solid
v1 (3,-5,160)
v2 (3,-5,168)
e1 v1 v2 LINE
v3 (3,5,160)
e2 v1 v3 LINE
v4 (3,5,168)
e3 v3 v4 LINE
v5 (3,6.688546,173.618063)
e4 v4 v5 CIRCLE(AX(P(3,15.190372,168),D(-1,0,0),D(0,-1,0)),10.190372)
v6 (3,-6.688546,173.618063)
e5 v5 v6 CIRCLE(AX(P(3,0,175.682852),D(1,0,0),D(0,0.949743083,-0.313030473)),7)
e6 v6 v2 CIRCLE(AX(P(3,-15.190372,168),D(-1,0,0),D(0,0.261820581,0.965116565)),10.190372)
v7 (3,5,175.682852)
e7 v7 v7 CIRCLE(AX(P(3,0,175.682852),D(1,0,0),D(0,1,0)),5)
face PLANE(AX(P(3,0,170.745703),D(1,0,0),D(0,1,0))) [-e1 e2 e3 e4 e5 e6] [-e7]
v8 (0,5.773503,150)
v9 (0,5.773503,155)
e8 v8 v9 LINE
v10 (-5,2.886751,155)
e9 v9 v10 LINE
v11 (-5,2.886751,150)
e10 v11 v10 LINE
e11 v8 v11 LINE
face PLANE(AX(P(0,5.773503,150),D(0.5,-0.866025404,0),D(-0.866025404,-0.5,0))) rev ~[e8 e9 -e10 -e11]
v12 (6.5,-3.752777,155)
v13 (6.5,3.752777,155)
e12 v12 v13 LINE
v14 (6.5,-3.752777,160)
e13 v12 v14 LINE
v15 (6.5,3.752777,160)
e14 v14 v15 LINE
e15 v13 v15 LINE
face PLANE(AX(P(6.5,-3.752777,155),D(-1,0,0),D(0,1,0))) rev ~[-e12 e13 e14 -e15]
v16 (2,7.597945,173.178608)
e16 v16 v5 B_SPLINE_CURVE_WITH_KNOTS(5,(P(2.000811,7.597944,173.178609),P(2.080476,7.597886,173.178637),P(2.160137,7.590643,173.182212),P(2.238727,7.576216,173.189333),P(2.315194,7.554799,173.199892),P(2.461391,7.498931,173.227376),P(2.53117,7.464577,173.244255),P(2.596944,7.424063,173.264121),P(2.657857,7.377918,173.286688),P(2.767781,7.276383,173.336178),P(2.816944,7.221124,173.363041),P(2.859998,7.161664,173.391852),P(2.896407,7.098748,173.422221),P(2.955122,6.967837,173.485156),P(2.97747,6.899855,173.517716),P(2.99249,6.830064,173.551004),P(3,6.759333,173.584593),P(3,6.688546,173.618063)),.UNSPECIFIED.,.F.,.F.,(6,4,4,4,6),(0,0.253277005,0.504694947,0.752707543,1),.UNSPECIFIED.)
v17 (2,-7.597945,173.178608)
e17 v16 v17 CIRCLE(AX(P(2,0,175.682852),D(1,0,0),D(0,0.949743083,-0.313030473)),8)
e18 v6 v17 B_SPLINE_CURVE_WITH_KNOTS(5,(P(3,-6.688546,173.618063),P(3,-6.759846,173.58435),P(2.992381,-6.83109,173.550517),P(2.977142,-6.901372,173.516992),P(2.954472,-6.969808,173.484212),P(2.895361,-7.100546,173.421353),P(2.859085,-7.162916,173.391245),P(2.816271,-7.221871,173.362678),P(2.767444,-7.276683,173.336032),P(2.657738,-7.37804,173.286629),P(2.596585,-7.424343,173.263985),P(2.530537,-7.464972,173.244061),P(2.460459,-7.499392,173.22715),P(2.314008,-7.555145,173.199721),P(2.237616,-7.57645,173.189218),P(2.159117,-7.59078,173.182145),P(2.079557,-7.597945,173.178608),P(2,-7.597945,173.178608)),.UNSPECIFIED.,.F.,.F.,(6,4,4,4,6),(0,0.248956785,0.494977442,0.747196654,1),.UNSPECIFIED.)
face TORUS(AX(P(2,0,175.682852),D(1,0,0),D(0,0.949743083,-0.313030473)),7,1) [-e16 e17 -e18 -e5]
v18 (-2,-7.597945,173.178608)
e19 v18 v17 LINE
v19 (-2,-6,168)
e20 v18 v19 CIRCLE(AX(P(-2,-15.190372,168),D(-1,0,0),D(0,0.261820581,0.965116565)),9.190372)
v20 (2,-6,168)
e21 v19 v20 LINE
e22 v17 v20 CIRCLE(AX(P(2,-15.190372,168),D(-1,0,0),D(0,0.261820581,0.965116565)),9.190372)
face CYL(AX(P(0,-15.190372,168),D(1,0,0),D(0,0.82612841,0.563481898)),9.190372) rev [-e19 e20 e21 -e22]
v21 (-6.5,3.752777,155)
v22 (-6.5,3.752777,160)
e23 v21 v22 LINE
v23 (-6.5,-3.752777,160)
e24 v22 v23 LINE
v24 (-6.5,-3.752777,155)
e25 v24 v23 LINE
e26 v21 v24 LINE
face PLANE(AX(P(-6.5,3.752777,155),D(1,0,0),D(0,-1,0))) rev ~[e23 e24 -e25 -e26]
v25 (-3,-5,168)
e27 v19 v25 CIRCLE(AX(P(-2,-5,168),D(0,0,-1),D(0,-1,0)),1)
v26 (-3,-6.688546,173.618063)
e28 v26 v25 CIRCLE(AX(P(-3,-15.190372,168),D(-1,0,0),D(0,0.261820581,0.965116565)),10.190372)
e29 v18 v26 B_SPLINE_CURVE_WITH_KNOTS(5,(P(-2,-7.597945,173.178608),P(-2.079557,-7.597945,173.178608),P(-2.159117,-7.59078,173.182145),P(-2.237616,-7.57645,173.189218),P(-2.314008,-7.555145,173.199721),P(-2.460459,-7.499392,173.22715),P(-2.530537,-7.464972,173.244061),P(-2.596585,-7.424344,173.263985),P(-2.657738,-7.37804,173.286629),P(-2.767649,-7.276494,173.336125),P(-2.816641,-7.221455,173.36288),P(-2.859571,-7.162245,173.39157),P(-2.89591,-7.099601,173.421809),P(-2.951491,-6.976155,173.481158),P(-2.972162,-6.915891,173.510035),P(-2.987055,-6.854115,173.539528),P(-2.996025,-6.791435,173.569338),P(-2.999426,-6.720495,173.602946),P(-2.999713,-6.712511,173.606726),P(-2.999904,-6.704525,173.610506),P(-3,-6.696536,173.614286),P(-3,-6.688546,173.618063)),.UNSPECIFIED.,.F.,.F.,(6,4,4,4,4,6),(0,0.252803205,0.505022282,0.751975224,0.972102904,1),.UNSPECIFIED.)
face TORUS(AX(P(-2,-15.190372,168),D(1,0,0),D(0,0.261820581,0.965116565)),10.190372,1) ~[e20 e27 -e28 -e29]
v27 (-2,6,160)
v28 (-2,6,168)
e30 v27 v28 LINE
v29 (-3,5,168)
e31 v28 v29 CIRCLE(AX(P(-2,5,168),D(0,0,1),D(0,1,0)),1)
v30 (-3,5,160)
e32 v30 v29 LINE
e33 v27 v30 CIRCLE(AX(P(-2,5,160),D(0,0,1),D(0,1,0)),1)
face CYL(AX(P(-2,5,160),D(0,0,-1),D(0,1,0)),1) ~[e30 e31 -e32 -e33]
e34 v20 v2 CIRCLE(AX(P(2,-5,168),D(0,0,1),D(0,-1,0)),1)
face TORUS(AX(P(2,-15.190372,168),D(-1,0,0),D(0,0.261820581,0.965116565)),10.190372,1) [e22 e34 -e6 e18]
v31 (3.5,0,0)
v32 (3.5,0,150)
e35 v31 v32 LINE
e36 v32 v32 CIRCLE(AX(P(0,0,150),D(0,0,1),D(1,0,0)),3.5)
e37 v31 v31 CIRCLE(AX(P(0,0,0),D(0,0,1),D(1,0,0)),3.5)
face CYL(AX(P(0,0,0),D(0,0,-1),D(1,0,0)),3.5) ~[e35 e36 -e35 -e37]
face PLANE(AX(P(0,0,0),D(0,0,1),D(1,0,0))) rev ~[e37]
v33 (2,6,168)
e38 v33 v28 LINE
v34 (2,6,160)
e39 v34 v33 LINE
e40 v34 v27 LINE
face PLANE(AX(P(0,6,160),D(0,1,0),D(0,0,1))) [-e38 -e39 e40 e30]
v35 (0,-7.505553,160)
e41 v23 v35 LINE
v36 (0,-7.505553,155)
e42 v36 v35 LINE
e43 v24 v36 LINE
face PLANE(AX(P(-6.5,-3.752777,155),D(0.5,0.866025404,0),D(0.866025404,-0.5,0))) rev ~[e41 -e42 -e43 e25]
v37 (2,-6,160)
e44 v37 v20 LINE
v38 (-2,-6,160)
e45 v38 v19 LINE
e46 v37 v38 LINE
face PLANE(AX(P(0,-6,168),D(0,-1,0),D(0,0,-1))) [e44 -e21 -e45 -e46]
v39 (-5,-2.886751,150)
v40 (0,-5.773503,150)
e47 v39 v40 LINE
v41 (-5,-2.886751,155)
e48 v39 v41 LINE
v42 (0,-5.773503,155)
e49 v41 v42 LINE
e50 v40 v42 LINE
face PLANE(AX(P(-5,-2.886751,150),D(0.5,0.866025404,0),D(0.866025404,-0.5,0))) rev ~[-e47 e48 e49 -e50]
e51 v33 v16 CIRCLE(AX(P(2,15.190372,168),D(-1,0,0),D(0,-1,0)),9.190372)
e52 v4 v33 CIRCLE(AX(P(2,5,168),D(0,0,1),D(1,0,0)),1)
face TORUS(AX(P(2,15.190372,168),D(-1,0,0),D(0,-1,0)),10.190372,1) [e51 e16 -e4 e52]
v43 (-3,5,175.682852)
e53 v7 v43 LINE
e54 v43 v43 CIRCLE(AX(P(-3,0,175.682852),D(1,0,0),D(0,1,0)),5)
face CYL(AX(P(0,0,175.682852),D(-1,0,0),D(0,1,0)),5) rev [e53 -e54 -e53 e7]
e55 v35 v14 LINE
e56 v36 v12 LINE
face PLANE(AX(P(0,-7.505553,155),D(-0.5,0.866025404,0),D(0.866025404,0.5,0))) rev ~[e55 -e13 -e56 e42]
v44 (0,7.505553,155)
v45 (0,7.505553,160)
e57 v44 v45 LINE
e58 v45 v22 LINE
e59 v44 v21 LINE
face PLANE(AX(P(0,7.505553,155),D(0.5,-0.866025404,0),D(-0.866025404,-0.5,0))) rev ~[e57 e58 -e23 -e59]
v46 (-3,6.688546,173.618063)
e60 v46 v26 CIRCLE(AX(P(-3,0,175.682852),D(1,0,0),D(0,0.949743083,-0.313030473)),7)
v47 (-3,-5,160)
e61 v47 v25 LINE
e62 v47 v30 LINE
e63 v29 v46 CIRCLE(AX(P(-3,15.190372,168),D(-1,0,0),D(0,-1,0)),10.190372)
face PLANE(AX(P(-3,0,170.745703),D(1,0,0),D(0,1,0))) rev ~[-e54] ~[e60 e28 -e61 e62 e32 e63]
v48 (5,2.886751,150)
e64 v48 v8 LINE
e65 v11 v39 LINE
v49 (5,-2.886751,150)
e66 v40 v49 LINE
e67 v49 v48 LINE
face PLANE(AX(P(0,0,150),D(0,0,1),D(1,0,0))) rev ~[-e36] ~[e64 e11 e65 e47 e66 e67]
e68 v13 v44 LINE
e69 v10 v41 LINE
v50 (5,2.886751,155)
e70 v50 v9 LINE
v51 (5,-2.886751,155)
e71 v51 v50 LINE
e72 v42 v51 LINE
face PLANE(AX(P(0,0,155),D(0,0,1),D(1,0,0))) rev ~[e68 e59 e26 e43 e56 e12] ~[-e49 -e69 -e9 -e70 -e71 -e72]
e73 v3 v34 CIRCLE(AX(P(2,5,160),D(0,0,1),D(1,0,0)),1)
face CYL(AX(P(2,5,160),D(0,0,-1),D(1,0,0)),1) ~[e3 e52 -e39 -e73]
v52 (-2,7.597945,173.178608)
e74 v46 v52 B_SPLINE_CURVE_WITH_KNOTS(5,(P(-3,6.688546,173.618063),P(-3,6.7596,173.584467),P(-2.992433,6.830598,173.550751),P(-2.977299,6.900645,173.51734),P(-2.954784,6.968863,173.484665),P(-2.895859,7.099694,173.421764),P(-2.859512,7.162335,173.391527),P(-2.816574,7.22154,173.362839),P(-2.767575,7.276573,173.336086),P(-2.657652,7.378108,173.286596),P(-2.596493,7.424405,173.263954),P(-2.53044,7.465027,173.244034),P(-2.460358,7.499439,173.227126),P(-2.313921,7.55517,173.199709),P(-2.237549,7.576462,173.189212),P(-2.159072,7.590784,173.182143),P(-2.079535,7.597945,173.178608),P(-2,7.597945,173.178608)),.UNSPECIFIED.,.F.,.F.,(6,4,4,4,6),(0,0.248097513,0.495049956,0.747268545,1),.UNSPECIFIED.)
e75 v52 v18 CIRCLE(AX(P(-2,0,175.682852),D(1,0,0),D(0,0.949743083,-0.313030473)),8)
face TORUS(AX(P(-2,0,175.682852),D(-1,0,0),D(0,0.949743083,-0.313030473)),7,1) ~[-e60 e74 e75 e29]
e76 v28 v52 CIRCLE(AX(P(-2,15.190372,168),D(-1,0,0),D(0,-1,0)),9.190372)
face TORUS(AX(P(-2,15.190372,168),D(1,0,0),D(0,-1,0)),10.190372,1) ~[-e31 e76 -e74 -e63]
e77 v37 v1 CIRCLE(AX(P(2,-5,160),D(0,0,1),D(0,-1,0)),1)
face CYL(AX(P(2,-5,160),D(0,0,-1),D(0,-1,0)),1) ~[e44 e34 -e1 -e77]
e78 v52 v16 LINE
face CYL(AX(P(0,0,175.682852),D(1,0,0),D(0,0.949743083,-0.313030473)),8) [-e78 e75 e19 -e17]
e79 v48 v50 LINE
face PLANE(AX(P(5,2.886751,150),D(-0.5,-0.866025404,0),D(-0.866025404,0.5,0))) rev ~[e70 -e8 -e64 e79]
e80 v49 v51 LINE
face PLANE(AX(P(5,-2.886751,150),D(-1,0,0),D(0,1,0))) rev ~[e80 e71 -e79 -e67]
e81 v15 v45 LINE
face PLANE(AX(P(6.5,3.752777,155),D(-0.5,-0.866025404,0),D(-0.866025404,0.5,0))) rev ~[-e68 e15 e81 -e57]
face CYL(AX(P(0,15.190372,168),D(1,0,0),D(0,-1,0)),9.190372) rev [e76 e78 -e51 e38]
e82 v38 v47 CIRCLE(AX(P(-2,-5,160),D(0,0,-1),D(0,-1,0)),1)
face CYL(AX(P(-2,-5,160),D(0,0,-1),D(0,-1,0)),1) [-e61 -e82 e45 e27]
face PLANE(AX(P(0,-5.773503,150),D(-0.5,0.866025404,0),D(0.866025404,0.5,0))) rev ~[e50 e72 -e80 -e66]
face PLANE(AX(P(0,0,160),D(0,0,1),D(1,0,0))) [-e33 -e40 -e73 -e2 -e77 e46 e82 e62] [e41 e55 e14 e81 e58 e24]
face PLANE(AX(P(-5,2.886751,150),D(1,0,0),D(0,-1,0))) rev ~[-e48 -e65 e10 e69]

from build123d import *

# Parameters (mm, degrees)
F0_R         = 3.5
F1_DEPTH     = 150
F3_DEPTH     = 5
F5_DEPTH     = 5
F6_R         = 5
F7_DEPTH     = 3
F8_F1_R      = 1
F8_F2_R      = 1
F8_T3_DEPTH  = 8
F8_T6_ANGLE  = 74.8218835265
F8_T7_DEPTH  = 8
F8_T10_ANGLE = 74.8218835265
F8_T11_DEPTH = 8
F8_T14_ANGLE = 74.8218835265
F8_T15_DEPTH = 8
F8_T18_ANGLE = 74.8218835265


# Not quite as in the source:
# - a fillet or chamfer that OpenCascade refuses, or shapes differently, is made with other operations: its cross-section is extruded or revolved along the edge and cut away or added


with BuildPart() as f1:
    # F0 (on Top) → F1 (new body)
    with BuildSketch(Plane.XY):
        Circle(F0_R)
    extrude(amount=F1_DEPTH)

    # F2 (on face) → F3 (join)
    with BuildSketch(Plane.XY.offset(150)):
        Polygon((5, -2.8867513459), (5, 2.8867513459), (0, 5.7735026919), (-5, 2.8867513459), (-5, -2.8867513459), (0, -5.7735026919), align=None)
    extrude(amount=F3_DEPTH)

    # F4 (on face) → F5 (join)
    with BuildSketch(Plane.XY.offset(155)):
        Polygon((6.5, -3.7527767497), (6.5, 3.7527767497), (0, 7.5055534995), (-6.5, 3.7527767497), (-6.5, -3.7527767497), (0, -7.5055534995), align=None)
    extrude(amount=F5_DEPTH)

    # F6 (on Right) → F7 (join, symmetric)
    with BuildSketch(Plane.YZ):
        with BuildLine():
            ThreePointArc((6, 168), (6.4085678246, 170.709769965), (7.5979446603, 173.1786084922))
            ThreePointArc((7.5979446603, 173.1786084922), (0, 183.6828522781), (-7.5979446603, 173.1786084922))
            ThreePointArc((-7.5979446603, 173.1786084922), (-6.4085678246, 170.709769965), (-6, 168))
            Line((-6, 168), (-6, 160))
            Line((-6, 160), (0, 160))
            Line((0, 160), (6, 160))
            Line((6, 160), (6, 168))
        make_face()
        with Locations((0, 175.6828522781)):
            Circle(F6_R, mode=Mode.SUBTRACT)
    extrude(amount=F7_DEPTH, both=True)

    # F8: fillet of radius 1 on 10 edges, made by hand

    # F8_f1
    f8_f1_edges = [f1.edges().sort_by_distance(p)[0] for p in [
        (3, 0, 183.6828522781),
    ]]
    fillet(f8_f1_edges, radius=F8_F1_R)

    # F8_f2
    f8_f2_edges = [f1.edges().sort_by_distance(p)[0] for p in [
        (-3, 0, 183.6828522781),
    ]]
    fillet(f8_f2_edges, radius=F8_F2_R)

    # F8_s4 → F8_t3 (cut)
    with BuildSketch(Plane.XY.offset(160)):
        with BuildLine():
            ThreePointArc((3, 5), (2.7071067812, 5.7071067812), (2, 6))
            Line((2, 6), (2, 6.02))
            Line((2, 6.02), (3.02, 6.02))
            Line((3.02, 6.02), (3.02, 5))
            Line((3.02, 5), (3, 5))
        make_face()
    extrude(amount=F8_T3_DEPTH, mode=Mode.SUBTRACT)

    # F8_s5 → F8_t6 (revolve, cut)
    with BuildSketch(Plane.XY.offset(168)):
        with BuildLine():
            ThreePointArc((2, 6), (2.7071067812, 5.7071067812), (3, 5))
            Line((3, 5), (3.02, 5))
            Line((3.02, 5), (3.02, 6.02))
            Line((3.02, 6.02), (2, 6.02))
            Line((2, 6.02), (2, 6))
        make_face()
    revolve(axis=Axis((3, 15.190372415, 168), (-1, 0, 0)), revolution_arc=F8_T6_ANGLE, mode=Mode.SUBTRACT)

    # F8_s8 → F8_t7 (cut)
    with BuildSketch(Plane.XY.offset(160)):
        with BuildLine():
            ThreePointArc((-2, 6), (-2.7071067812, 5.7071067812), (-3, 5))
            Line((-3, 5), (-3.02, 5))
            Line((-3.02, 5), (-3.02, 6.02))
            Line((-3.02, 6.02), (-2, 6.02))
            Line((-2, 6.02), (-2, 6))
        make_face()
    extrude(amount=F8_T7_DEPTH, mode=Mode.SUBTRACT)

    # F8_s9 → F8_t10 (revolve, cut)
    with BuildSketch(Plane.XY.offset(168)):
        with BuildLine():
            ThreePointArc((-2, 6), (-2.7071067812, 5.7071067812), (-3, 5))
            Line((-3, 5), (-3.02, 5))
            Line((-3.02, 5), (-3.02, 6.02))
            Line((-3.02, 6.02), (-2, 6.02))
            Line((-2, 6.02), (-2, 6))
        make_face()
    revolve(axis=Axis((-3, 15.190372415, 168), (-1, 0, 0)), revolution_arc=F8_T10_ANGLE, mode=Mode.SUBTRACT)

    # F8_s12 → F8_t11 (cut)
    with BuildSketch(Plane.XY.offset(160)):
        with BuildLine():
            ThreePointArc((-2, -6), (-2.7071067812, -5.7071067812), (-3, -5))
            Line((-3, -5), (-3.02, -5))
            Line((-3.02, -5), (-3.02, -6.02))
            Line((-3.02, -6.02), (-2, -6.02))
            Line((-2, -6.02), (-2, -6))
        make_face()
    extrude(amount=F8_T11_DEPTH, mode=Mode.SUBTRACT)

    # F8_s13 → F8_t14 (revolve, cut)
    with BuildSketch(Plane(origin=(0, -56.6005519955, 15.3548182499), x_dir=(1, 0, 0), z_dir=(0, -0.9651165645, 0.2618205815))):
        with BuildLine():
            ThreePointArc((-2, 167.3528031133), (-2.7071067812, 167.6456963322), (-3, 168.3528031133))
            Line((-3, 168.3528031133), (-3.02, 168.3528031133))
            Line((-3.02, 168.3528031133), (-3.02, 167.3328031133))
            Line((-3.02, 167.3328031133), (-2, 167.3328031133))
            Line((-2, 167.3328031133), (-2, 167.3528031133))
        make_face()
    revolve(axis=Axis((-3, -15.190372415, 168), (-1, 0, 0)), revolution_arc=F8_T14_ANGLE, mode=Mode.SUBTRACT)

    # F8_s16 → F8_t15 (cut)
    with BuildSketch(Plane.XY.offset(160)):
        with BuildLine():
            ThreePointArc((2, -6), (2.7071067812, -5.7071067812), (3, -5))
            Line((3, -5), (3.02, -5))
            Line((3.02, -5), (3.02, -6.02))
            Line((3.02, -6.02), (2, -6.02))
            Line((2, -6.02), (2, -6))
        make_face()
    extrude(amount=F8_T15_DEPTH, mode=Mode.SUBTRACT)

    # F8_s17 → F8_t18 (revolve, cut)
    with BuildSketch(Plane(origin=(0, -56.6005519955, 15.3548182499), x_dir=(1, 0, 0), z_dir=(0, -0.9651165645, 0.2618205815))):
        with BuildLine():
            ThreePointArc((2, 167.3528031133), (2.7071067812, 167.6456963322), (3, 168.3528031133))
            Line((3, 168.3528031133), (3.02, 168.3528031133))
            Line((3.02, 168.3528031133), (3.02, 167.3328031133))
            Line((3.02, 167.3328031133), (2, 167.3328031133))
            Line((2, 167.3328031133), (2, 167.3528031133))
        make_face()
    revolve(axis=Axis((3, -15.190372415, 168), (-1, 0, 0)), revolution_arc=F8_T18_ANGLE, mode=Mode.SUBTRACT)


solid = f1.part
